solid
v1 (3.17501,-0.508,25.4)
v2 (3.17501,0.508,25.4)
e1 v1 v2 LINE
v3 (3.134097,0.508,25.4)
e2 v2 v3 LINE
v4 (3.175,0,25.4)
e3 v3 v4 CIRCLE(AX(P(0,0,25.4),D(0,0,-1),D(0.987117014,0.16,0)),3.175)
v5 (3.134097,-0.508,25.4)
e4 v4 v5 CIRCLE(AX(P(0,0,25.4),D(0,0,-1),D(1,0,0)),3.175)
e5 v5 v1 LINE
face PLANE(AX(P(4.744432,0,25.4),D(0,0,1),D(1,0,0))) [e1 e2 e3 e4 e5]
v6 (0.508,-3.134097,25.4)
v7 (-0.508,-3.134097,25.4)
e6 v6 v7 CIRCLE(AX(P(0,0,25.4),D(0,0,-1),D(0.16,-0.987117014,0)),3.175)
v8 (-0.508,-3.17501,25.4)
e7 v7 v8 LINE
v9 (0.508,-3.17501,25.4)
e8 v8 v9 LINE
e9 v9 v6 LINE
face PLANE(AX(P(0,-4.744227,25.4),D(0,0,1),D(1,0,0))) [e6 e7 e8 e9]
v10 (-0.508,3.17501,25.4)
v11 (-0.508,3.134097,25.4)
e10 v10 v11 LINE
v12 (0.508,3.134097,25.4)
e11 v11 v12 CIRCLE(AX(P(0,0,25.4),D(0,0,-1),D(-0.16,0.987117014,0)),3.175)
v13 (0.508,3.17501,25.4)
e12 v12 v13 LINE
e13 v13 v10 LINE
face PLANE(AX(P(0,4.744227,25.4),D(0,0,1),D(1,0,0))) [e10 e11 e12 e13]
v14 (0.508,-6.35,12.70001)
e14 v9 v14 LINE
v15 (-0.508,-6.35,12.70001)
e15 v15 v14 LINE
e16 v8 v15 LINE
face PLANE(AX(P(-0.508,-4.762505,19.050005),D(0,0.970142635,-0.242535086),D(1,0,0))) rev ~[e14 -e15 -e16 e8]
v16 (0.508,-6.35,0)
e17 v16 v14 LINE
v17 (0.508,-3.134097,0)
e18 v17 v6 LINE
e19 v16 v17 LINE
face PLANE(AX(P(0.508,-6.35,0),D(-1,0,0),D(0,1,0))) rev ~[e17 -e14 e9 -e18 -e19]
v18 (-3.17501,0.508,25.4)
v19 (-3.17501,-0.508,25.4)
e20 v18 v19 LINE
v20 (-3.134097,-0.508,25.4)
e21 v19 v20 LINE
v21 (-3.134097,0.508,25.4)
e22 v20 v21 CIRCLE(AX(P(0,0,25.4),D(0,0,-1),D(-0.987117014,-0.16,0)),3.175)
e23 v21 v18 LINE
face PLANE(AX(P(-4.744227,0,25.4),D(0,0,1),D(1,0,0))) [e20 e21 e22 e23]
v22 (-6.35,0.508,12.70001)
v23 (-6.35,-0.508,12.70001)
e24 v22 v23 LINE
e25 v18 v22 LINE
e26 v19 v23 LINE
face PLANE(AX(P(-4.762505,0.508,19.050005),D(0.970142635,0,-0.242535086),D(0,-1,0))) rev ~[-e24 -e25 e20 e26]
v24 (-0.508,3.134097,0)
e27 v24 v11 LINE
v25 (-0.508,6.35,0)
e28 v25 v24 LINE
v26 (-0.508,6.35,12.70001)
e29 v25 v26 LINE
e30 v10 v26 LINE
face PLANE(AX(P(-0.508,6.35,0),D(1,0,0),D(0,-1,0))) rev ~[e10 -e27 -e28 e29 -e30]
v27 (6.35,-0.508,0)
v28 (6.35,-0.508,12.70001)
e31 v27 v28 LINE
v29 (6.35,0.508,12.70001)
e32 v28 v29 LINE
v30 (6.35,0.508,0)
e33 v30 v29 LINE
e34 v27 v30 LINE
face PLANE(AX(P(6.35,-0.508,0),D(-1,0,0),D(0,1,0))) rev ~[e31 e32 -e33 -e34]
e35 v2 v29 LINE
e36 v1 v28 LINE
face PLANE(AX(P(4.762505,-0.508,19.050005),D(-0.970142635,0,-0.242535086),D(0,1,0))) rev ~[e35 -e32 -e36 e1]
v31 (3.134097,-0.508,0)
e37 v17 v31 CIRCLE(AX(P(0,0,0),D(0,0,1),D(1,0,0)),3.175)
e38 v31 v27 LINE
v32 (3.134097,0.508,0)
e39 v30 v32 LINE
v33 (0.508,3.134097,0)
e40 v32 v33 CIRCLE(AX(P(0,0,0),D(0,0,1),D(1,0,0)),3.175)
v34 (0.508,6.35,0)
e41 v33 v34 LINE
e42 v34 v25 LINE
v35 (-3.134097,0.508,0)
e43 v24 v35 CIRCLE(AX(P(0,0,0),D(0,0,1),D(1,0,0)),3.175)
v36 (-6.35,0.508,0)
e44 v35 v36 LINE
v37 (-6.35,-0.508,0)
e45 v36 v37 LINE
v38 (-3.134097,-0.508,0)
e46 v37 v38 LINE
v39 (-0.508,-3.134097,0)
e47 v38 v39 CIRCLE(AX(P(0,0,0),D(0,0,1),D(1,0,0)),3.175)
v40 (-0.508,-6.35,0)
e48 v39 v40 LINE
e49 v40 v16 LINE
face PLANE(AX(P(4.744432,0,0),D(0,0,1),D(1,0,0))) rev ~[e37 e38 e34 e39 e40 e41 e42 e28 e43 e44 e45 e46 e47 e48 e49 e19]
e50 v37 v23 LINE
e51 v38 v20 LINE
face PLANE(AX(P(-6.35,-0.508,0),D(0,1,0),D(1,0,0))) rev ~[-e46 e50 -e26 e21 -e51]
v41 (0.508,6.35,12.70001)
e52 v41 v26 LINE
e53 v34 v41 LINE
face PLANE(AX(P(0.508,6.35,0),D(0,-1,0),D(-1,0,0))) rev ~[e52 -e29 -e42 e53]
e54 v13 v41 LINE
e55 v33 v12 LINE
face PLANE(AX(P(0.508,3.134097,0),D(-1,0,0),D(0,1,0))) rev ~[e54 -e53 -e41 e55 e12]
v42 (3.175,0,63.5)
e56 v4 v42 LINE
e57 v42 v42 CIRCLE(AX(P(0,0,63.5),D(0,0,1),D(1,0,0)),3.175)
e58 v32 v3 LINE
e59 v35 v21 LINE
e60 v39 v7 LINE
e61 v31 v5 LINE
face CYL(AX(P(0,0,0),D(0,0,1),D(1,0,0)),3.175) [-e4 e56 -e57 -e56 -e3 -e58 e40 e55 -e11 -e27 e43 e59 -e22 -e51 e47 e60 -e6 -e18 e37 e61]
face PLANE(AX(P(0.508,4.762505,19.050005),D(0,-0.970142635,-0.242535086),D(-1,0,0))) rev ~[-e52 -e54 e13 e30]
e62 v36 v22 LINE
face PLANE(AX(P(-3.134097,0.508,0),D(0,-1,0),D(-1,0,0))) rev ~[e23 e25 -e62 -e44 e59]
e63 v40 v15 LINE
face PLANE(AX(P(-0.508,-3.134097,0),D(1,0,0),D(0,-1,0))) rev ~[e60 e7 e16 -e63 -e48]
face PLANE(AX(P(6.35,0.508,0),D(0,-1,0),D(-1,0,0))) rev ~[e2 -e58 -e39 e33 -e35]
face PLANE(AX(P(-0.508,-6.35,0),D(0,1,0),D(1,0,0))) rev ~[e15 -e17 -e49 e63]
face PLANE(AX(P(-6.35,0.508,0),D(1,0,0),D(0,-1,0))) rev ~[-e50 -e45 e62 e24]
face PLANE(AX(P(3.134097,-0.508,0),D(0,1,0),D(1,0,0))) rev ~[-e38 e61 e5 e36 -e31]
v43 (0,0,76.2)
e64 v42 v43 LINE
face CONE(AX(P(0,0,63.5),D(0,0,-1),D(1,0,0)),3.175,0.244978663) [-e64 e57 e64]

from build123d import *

# Parameters (mm, degrees)
F3_DEPTH   = 25.4
F4_SIZE2   = 12.69999
F4_SIZE    = 3.17499
F4_2_SIZE2 = 12.69999
F4_2_SIZE  = 3.17499
F5_SIZE2   = 12.69999
F5_SIZE    = 3.17499
F5_2_SIZE2 = 12.69999
F5_2_SIZE  = 3.17499


# Not quite as in the source:
# - a fillet or chamfer is up to 0.001 mm smaller than in the source, because OpenCascade refuses the exact size


with BuildPart() as f2:
    # F1 (on Front) → F2 (revolve)
    with BuildSketch(Plane.XZ):
        Polygon((0, 76.2), (0, 0), (3.175, 0), (3.175, 63.5), align=None)
    revolve(axis=Axis((0, 0, 38.1), (0, 0, 1)))

    # F0 (on Top) → F3 (join)
    with BuildSketch(Plane.XY):
        with BuildLine():
            ThreePointArc((3.1340965205, 0.508), (3.1647576094, 0.2548220431), (3.175, 0))
            ThreePointArc((3.175, 0), (3.1647576094, -0.2548220431), (3.1340965205, -0.508))
            Line((3.1340965205, -0.508), (6.35, -0.508))
            Line((6.35, -0.508), (6.35, 0.508))
            Line((6.35, 0.508), (3.1340965205, 0.508))
        make_face()
        with BuildLine():
            Line((0.508, -6.35), (0.508, -3.1340965205))
            ThreePointArc((0.508, -3.1340965205), (0, -3.175), (-0.508, -3.1340965205))
            Line((-0.508, -3.1340965205), (-0.508, -6.35))
            Line((-0.508, -6.35), (0.508, -6.35))
        make_face()
        with BuildLine():
            ThreePointArc((-3.1340965205, -0.508), (-3.175, 0), (-3.1340965205, 0.508))
            Line((-3.1340965205, 0.508), (-6.35, 0.508))
            Line((-6.35, 0.508), (-6.35, -0.508))
            Line((-6.35, -0.508), (-3.1340965205, -0.508))
        make_face()
        with BuildLine():
            ThreePointArc((-0.508, 3.1340965205), (0, 3.175), (0.508, 3.1340965205))
            Line((0.508, 3.1340965205), (0.508, 6.35))
            Line((0.508, 6.35), (-0.508, 6.35))
            Line((-0.508, 6.35), (-0.508, 3.1340965205))
        make_face()
    extrude(amount=F3_DEPTH)

    # F4 (size 3.175 and 12.7 in the source; OpenCascade refuses exactly that, so slightly less here)
    f4_edges = [f2.edges().sort_by_distance(p)[0] for p in [
        (0, -6.35, 25.4),
    ]]
    f4_side = f2.faces().sort_by_distance((0, -4.755677, 25.4))[0]
    chamfer(f4_edges, length=F4_SIZE, length2=F4_SIZE2, reference=f4_side)

    # F4#2 (size 3.175 and 12.7 in the source; OpenCascade refuses exactly that, so slightly less here)
    f4_2_edges = [f2.edges().sort_by_distance(p)[0] for p in [
        (6.35, 0, 25.4),
    ]]
    f4_2_side = f2.faces().sort_by_distance((4.755677, 0, 25.4))[0]
    chamfer(f4_2_edges, length=F4_2_SIZE, length2=F4_2_SIZE2, reference=f4_2_side)

    # F5 (size 3.175 and 12.7 in the source; OpenCascade refuses exactly that, so slightly less here)
    f5_edges = [f2.edges().sort_by_distance(p)[0] for p in [
        (-6.35, 0, 25.4),
    ]]
    f5_side = f2.faces().sort_by_distance((-4.755677, 0, 25.4))[0]
    chamfer(f5_edges, length=F5_SIZE, length2=F5_SIZE2, reference=f5_side)

    # F5#2 (size 3.175 and 12.7 in the source; OpenCascade refuses exactly that, so slightly less here)
    f5_2_edges = [f2.edges().sort_by_distance(p)[0] for p in [
        (0, 6.35, 25.4),
    ]]
    f5_2_side = f2.faces().sort_by_distance((0, 4.755677, 25.4))[0]
    chamfer(f5_2_edges, length=F5_2_SIZE, length2=F5_2_SIZE2, reference=f5_2_side)


solid = f2.part
